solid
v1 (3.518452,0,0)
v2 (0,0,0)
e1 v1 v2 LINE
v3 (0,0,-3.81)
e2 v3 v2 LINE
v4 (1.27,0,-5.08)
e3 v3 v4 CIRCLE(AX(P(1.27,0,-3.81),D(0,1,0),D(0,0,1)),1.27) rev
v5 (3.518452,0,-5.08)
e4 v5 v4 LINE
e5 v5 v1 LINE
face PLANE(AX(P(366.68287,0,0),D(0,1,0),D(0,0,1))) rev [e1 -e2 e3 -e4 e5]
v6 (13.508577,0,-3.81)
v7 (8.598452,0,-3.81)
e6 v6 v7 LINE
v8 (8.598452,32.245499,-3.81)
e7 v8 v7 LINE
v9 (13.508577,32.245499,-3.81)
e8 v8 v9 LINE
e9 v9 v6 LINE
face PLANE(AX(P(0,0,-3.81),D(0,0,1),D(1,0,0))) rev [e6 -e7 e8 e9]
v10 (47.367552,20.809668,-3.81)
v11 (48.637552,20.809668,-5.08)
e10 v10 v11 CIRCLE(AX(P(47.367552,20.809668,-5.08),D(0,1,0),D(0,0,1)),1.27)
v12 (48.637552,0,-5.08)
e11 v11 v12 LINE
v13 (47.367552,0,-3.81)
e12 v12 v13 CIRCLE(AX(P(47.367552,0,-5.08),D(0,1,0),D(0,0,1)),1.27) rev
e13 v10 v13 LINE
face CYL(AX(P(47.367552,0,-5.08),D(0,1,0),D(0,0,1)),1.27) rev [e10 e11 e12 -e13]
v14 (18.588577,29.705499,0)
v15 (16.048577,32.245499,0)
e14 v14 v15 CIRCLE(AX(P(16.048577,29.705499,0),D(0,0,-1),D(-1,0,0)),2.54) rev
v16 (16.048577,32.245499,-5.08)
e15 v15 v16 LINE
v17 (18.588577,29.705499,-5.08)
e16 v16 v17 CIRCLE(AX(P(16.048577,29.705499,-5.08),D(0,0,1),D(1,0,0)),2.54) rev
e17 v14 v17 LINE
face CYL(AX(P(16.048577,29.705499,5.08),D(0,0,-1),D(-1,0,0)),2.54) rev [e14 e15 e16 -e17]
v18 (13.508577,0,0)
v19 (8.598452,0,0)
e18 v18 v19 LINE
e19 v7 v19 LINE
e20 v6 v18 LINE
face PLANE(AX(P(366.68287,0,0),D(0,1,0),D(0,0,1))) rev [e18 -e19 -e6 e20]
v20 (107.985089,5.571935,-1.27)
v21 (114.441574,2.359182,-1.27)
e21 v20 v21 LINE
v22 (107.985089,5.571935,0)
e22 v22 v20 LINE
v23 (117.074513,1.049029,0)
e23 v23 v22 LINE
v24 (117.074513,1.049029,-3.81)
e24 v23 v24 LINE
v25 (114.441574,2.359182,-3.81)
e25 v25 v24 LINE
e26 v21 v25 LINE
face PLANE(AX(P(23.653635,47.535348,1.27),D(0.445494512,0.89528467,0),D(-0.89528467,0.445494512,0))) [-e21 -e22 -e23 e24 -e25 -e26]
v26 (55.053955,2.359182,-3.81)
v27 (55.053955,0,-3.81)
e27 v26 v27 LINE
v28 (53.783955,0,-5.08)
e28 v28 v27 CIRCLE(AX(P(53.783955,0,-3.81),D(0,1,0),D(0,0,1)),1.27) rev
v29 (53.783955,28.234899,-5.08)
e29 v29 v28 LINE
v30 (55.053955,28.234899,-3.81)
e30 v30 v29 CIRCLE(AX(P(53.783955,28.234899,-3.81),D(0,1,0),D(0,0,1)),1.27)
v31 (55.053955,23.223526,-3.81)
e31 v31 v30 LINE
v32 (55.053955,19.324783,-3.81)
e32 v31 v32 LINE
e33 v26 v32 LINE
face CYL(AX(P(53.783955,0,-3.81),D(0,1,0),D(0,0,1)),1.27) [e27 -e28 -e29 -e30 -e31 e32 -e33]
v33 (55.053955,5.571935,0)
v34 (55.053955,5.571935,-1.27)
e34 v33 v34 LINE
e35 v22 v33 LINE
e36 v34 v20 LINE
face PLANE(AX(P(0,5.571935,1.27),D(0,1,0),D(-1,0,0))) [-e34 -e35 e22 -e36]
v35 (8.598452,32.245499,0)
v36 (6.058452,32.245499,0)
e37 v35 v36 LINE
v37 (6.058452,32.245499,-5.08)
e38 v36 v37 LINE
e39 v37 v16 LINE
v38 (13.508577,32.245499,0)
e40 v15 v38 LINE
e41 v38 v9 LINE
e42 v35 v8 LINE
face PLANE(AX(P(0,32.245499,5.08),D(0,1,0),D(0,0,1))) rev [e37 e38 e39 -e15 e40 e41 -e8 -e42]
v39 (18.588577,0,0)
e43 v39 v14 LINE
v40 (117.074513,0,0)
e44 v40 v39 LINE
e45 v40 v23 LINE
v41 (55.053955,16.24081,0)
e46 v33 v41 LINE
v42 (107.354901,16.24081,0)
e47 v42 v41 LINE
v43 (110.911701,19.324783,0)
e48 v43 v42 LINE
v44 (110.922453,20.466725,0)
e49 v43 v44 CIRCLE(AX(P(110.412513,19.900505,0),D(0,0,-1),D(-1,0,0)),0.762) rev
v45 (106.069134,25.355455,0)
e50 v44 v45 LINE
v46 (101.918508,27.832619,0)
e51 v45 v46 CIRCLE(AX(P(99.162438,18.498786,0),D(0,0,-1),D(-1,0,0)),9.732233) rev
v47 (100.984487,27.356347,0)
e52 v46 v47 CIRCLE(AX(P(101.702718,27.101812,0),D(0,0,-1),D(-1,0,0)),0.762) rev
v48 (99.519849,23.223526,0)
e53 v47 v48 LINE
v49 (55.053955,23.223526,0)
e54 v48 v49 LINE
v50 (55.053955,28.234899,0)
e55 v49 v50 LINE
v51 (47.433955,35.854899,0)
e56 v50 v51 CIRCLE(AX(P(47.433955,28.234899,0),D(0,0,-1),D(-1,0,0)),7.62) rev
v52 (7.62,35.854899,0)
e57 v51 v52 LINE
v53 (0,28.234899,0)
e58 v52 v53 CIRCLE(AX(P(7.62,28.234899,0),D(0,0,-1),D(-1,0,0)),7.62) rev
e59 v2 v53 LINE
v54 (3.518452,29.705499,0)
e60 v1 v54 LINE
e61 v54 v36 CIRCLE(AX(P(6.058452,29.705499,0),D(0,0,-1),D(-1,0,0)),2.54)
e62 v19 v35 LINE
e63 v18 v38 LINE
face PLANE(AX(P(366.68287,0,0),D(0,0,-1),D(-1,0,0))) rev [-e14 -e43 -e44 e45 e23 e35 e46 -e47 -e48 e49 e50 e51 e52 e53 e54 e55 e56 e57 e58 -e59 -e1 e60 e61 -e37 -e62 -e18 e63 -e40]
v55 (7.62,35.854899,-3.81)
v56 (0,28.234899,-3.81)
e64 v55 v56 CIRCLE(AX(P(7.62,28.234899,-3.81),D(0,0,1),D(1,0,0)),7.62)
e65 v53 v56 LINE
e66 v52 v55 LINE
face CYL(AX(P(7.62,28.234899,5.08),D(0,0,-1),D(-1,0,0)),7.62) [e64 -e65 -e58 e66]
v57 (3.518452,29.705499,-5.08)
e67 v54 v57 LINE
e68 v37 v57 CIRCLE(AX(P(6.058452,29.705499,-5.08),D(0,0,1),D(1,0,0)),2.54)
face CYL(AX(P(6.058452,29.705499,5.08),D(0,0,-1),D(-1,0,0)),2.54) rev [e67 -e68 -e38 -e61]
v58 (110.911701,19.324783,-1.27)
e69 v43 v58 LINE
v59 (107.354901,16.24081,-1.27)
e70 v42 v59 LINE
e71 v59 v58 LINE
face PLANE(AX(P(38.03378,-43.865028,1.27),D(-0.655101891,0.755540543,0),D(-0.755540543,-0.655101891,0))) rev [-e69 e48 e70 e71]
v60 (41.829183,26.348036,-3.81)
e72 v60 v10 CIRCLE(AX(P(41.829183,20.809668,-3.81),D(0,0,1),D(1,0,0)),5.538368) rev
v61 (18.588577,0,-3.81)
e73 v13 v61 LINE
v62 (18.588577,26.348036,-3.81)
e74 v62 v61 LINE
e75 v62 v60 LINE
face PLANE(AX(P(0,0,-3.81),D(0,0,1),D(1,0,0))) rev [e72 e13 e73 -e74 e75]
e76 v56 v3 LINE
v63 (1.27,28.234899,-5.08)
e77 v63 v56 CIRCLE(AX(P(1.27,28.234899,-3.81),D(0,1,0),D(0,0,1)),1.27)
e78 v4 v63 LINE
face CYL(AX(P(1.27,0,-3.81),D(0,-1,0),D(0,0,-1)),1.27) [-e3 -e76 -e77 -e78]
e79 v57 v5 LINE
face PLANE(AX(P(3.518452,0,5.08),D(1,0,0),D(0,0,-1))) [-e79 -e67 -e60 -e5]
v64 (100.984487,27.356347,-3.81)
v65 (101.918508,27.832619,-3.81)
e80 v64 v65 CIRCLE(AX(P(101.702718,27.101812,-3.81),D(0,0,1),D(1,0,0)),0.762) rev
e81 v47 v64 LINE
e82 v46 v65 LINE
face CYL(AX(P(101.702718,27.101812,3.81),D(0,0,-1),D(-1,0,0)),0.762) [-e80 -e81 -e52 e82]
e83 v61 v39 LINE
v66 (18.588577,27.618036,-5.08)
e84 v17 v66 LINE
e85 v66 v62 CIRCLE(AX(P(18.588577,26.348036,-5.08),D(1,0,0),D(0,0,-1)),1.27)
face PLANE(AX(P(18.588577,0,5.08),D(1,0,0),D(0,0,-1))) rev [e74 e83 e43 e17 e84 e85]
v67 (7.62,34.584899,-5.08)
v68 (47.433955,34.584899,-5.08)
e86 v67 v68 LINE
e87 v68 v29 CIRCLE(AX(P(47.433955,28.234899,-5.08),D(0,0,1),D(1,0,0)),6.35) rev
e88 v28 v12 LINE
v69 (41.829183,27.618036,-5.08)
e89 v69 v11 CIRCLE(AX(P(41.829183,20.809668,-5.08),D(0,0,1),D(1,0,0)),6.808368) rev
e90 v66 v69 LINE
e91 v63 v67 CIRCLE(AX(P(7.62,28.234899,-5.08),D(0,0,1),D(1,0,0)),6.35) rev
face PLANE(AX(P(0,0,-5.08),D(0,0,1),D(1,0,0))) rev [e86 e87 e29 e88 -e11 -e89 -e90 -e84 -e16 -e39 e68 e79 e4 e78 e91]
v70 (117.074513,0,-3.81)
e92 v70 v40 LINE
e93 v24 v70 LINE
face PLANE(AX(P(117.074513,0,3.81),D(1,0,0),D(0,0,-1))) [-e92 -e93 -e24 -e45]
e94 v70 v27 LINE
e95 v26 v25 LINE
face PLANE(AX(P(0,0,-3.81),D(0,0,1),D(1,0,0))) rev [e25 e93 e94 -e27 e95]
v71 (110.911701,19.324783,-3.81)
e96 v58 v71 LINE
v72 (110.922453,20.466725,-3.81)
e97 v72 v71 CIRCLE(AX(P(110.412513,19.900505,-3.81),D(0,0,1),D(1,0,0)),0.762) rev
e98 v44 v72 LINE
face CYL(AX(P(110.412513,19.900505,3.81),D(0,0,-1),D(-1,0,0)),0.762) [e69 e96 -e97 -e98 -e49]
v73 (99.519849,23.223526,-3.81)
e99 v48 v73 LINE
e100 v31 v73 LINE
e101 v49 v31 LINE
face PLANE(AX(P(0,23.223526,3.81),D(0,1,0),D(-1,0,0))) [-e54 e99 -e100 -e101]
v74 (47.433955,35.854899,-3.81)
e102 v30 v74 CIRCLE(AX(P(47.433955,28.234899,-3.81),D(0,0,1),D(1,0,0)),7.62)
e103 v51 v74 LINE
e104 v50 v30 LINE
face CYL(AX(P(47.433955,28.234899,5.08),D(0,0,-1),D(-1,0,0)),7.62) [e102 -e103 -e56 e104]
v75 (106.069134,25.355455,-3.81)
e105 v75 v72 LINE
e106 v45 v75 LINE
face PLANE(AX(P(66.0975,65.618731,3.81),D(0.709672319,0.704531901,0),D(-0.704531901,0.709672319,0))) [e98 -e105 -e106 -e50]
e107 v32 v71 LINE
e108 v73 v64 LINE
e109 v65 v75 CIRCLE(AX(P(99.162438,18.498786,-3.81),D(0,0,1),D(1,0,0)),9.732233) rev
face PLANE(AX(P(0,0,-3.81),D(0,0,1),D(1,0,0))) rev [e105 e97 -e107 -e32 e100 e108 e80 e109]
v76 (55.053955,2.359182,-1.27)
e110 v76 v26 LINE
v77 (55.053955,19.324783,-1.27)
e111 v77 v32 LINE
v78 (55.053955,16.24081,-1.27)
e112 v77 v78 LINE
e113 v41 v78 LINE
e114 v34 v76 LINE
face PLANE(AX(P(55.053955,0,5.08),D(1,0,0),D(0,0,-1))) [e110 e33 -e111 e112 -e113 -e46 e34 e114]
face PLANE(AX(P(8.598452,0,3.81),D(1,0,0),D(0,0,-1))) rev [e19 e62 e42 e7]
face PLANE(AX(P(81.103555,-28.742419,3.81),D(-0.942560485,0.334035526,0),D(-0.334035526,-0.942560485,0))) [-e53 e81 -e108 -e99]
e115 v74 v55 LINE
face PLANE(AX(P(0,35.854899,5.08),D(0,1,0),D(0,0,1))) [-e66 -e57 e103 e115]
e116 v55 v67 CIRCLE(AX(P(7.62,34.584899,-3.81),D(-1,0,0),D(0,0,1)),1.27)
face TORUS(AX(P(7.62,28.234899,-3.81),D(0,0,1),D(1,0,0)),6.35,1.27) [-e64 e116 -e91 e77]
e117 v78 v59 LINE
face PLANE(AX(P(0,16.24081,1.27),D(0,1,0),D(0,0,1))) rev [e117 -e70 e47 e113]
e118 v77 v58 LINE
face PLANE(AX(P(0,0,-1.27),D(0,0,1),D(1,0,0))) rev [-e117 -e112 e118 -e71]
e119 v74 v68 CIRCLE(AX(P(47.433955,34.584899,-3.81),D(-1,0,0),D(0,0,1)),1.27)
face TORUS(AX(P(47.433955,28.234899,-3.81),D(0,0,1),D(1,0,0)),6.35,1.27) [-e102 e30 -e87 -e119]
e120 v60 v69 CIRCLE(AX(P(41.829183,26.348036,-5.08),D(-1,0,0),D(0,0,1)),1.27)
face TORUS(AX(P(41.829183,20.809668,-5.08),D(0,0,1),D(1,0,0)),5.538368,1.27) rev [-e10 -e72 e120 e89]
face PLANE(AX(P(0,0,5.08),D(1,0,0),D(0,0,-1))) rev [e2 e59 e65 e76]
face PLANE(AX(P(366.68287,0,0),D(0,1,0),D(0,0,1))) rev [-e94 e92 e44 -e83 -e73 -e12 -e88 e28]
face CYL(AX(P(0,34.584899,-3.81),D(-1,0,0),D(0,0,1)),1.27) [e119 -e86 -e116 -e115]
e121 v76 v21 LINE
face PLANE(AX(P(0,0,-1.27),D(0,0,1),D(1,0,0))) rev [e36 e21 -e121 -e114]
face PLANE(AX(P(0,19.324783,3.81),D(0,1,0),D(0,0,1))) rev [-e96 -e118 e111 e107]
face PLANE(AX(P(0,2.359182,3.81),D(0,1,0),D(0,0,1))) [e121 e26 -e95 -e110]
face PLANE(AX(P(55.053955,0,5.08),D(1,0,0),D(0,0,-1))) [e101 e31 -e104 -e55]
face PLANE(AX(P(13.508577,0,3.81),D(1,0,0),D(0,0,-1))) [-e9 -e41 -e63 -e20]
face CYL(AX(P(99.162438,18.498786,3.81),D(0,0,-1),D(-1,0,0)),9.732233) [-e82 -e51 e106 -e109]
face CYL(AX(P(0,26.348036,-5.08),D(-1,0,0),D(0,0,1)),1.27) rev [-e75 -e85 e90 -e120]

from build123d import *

# Parameters (mm, degrees)
EXTRUDE1_DEPTH          = 5.08
EXTRUDE2_DEPTH          = 1.27
EXTRUDE3_DEPTH          = 3.81
SKETCH1_5_W             = 4.91012523
SKETCH1_5_H             = 32.245498845
EXTRUDE4_DEPTH          = 3.81
FILLET2_R               = 1.27
FILLET3_R               = 1.27
CUT_EXTRUDE1_DEPTH      = 123.54722299
CUT_EXTRUDE1_DEPTH_BACK = 123.54722299


with BuildPart() as part:
    # Sketch1 → Extrude1 (new, symmetric)
    with BuildSketch(Plane.XY):
        with BuildLine():
            Line((55.053954756, 23.223525864), (55.053954756, 28.234899079))
            ThreePointArc((55.053954756, 28.234899079), (52.822108428, 33.623052752), (47.433954756, 35.854899079))
            Line((47.433954756, 35.854899079), (7.62, 35.854899079))
            ThreePointArc((7.62, 35.854899079), (2.231846327, 33.623052752), (0, 28.234899079))
            Line((0, 28.234899079), (0, -28.234899079))
            ThreePointArc((0, -28.234899079), (2.231846327, -33.623052752), (7.62, -35.854899079))
            Line((7.62, -35.854899079), (47.433954756, -35.854899079))
            ThreePointArc((47.433954756, -35.854899079), (52.822108428, -33.623052752), (55.053954756, -28.234899079))
            Line((55.053954756, -28.234899079), (55.053954756, -23.223525864))
            Line((55.053954756, -23.223525864), (55.053954756, -19.324782682))
            Line((55.053954756, -19.324782682), (55.053954756, -16.240810389))
            Line((55.053954756, -16.240810389), (55.053954756, -5.571934871))
            Line((55.053954756, -5.571934871), (55.053954756, -2.359181621))
            Line((55.053954756, -2.359181621), (55.053954756, 2.359181621))
            Line((55.053954756, 2.359181621), (55.053954756, 5.571934871))
            Line((55.053954756, 5.571934871), (55.053954756, 16.240810389))
            Line((55.053954756, 16.240810389), (55.053954756, 19.324782682))
            Line((55.053954756, 19.324782682), (55.053954756, 23.223525864))
        make_face()
        with BuildLine():
            ThreePointArc((16.048576777, 32.245498845), (17.844628001, 31.501550069), (18.588576777, 29.705498845))
            Line((18.588576777, 29.705498845), (18.588576777, 27.618036038))
            Line((18.588576777, 27.618036038), (41.829183295, 27.618036038))
            ThreePointArc((41.829183295, 27.618036038), (46.643426698, 25.623911128), (48.637551607, 20.809667725))
            Line((48.637551607, 20.809667725), (48.637551607, -20.809667725))
            ThreePointArc((48.637551607, -20.809667725), (46.643426698, -25.623911128), (41.829183295, -27.618036038))
            Line((41.829183295, -27.618036038), (18.588576777, -27.618036038))
            Line((18.588576777, -27.618036038), (18.588576777, -29.705498845))
            ThreePointArc((18.588576777, -29.705498845), (17.844628001, -31.501550069), (16.048576777, -32.245498845))
            Line((16.048576777, -32.245498845), (13.508576777, -32.245498845))
            Line((13.508576777, -32.245498845), (8.598451547, -32.245498845))
            Line((8.598451547, -32.245498845), (6.058451547, -32.245498845))
            ThreePointArc((6.058451547, -32.245498845), (4.262400322, -31.501550069), (3.518451547, -29.705498845))
            Line((3.518451547, -29.705498845), (3.518451547, 29.705498845))
            ThreePointArc((3.518451547, 29.705498845), (4.262400322, 31.501550069), (6.058451547, 32.245498845))
            Line((6.058451547, 32.245498845), (8.598451547, 32.245498845))
            Line((8.598451547, 32.245498845), (13.508576777, 32.245498845))
            Line((13.508576777, 32.245498845), (16.048576777, 32.245498845))
        make_face(mode=Mode.SUBTRACT)
    extrude(amount=EXTRUDE1_DEPTH, both=True)

    # Sketch1<3> → Extrude2 (add, symmetric)
    with BuildSketch(Plane.XY):
        Polygon((110.911701022, 19.324782682), (55.053954756, 19.324782682), (55.053954756, 16.240810389), (107.354901489, 16.240810389), align=None)
        Polygon((114.44157437, -2.359181621), (55.053954756, -2.359181621), (55.053954756, -5.571934871), (107.985089149, -5.571934871), align=None)
        Polygon((107.985089149, 5.571934871), (55.053954756, 5.571934871), (55.053954756, 2.359181621), (114.44157437, 2.359181621), align=None)
        Polygon((107.354901489, -16.240810389), (55.053954756, -16.240810389), (55.053954756, -19.324782682), (110.911701022, -19.324782682), align=None)
    extrude(amount=EXTRUDE2_DEPTH, both=True)

    # Sketch1<4> → Extrude3 (add, symmetric)
    with BuildSketch(Plane.XY):
        with BuildLine():
            Line((99.519849351, 23.223525864), (55.053954756, 23.223525864))
            Line((55.053954756, 23.223525864), (55.053954756, 19.324782682))
            Line((55.053954756, 19.324782682), (110.911701022, 19.324782682))
            ThreePointArc((110.911701022, 19.324782682), (111.174479609, 19.893330482), (110.922452685, 20.466725298))
            Line((110.922452685, 20.466725298), (106.069134127, 25.355454719))
            ThreePointArc((106.069134127, 25.355454719), (104.150057648, 26.85581949), (101.918508412, 27.832618847))
            ThreePointArc((101.918508412, 27.832618847), (101.356567079, 27.780652221), (100.984486575, 27.356347272))
            Line((100.984486575, 27.356347272), (99.519849351, 23.223525864))
        make_face()
        Polygon((114.44157437, 2.359181621), (55.053954756, 2.359181621), (55.053954756, -2.359181621), (114.44157437, -2.359181621), (117.074513308, -1.049028675), (117.074513308, 1.049028675), align=None)
        with BuildLine():
            Line((55.053954756, -19.324782682), (55.053954756, -23.223525864))
            Line((55.053954756, -23.223525864), (99.519849351, -23.223525864))
            Line((99.519849351, -23.223525864), (101.216749822, -28.011733127))
            ThreePointArc((101.216749822, -28.011733127), (103.835645626, -27.035617331), (106.069134127, -25.355454719))
            Line((106.069134127, -25.355454719), (110.922452685, -20.466725298))
            ThreePointArc((110.922452685, -20.466725298), (111.174479609, -19.893330482), (110.911701022, -19.324782682))
            Line((110.911701022, -19.324782682), (55.053954756, -19.324782682))
        make_face()
    extrude(amount=EXTRUDE3_DEPTH, both=True)

    # Sketch1<5> → Extrude4 (add, symmetric)
    with BuildSketch(Plane.XY):
        with BuildLine():
            Line((48.637551607, 0), (18.588576777, 0))
            Line((18.588576777, 0), (18.588576777, -27.618036038))
            Line((18.588576777, -27.618036038), (41.829183295, -27.618036038))
            ThreePointArc((41.829183295, -27.618036038), (46.643426698, -25.623911128), (48.637551607, -20.809667725))
            Line((48.637551607, -20.809667725), (48.637551607, 0))
        make_face()
        with BuildLine():
            Line((18.588576777, 27.618036038), (18.588576777, 0))
            Line((18.588576777, 0), (48.637551607, 0))
            Line((48.637551607, 0), (48.637551607, 20.809667725))
            ThreePointArc((48.637551607, 20.809667725), (46.643426698, 25.623911128), (41.829183295, 27.618036038))
            Line((41.829183295, 27.618036038), (18.588576777, 27.618036038))
        make_face()
        with Locations((11.053514162, -16.122749423)):
            Rectangle(SKETCH1_5_W, SKETCH1_5_H)
        with Locations((11.053514162, 16.122749423)):
            Rectangle(SKETCH1_5_W, SKETCH1_5_H)
    extrude(amount=EXTRUDE4_DEPTH, both=True)

    # Fillet2
    fillet2_edges = [part.edges().sort_by_distance(p)[0] for p in [
        (30.208880036, -27.618036038, -3.81),
        (30.208880036, -27.618036038, 3.81),
        (46.643426698, -25.623911128, -3.81),
        (46.643426698, -25.623911128, 3.81),
        (48.637551607, 0, -3.81),
        (48.637551607, 0, 3.81),
        (46.643426698, 25.623911128, -3.81),
        (46.643426698, 25.623911128, 3.81),
        (30.208880036, 27.618036038, -3.81),
        (30.208880036, 27.618036038, 3.81),
    ]]
    fillet(fillet2_edges, radius=FILLET2_R - 0.0001)  # a hair under: the kernel refuses the full size

    # Fillet3
    fillet3_edges = [part.edges().sort_by_distance(p)[0] for p in [
        (2.231846327, 33.623052752, -5.08),
        (27.526977378, 35.854899079, -5.08),
        (52.822108428, 33.623052752, -5.08),
        (55.053954756, 0, -5.08),
        (52.822108428, -33.623052752, -5.08),
        (27.526977378, -35.854899079, -5.08),
        (2.231846327, -33.623052752, -5.08),
        (0, 0, -5.08),
        (0, 0, 5.08),
        (2.231846327, -33.623052752, 5.08),
        (27.526977378, -35.854899079, 5.08),
        (52.822108428, -33.623052752, 5.08),
        (55.053954756, 0, 5.08),
        (52.822108428, 33.623052752, 5.08),
        (27.526977378, 35.854899079, 5.08),
        (2.231846327, 33.623052752, 5.08),
    ]]
    fillet(fillet3_edges, radius=FILLET3_R - 0.0001)  # a hair under: the kernel refuses the full size

    # Sketch2 → Cut-Extrude1 (cut, two sides: drawn at the far end of the back side and taken through both)
    with BuildSketch(Plane(origin=(117.074513308, 0, 0), x_dir=(0, 0, -1), z_dir=(1, 0, 0)).offset(-CUT_EXTRUDE1_DEPTH_BACK)):
        Polygon((158.859018875, 0), (5.08, 0), (0, 0), (0, 35.854899079), (0, 189.633917954), (-235.763888228, -7.868830363), (-76.904869352, -197.502748317), align=None)
    extrude(amount=CUT_EXTRUDE1_DEPTH + CUT_EXTRUDE1_DEPTH_BACK, mode=Mode.SUBTRACT)


solid = part.part
